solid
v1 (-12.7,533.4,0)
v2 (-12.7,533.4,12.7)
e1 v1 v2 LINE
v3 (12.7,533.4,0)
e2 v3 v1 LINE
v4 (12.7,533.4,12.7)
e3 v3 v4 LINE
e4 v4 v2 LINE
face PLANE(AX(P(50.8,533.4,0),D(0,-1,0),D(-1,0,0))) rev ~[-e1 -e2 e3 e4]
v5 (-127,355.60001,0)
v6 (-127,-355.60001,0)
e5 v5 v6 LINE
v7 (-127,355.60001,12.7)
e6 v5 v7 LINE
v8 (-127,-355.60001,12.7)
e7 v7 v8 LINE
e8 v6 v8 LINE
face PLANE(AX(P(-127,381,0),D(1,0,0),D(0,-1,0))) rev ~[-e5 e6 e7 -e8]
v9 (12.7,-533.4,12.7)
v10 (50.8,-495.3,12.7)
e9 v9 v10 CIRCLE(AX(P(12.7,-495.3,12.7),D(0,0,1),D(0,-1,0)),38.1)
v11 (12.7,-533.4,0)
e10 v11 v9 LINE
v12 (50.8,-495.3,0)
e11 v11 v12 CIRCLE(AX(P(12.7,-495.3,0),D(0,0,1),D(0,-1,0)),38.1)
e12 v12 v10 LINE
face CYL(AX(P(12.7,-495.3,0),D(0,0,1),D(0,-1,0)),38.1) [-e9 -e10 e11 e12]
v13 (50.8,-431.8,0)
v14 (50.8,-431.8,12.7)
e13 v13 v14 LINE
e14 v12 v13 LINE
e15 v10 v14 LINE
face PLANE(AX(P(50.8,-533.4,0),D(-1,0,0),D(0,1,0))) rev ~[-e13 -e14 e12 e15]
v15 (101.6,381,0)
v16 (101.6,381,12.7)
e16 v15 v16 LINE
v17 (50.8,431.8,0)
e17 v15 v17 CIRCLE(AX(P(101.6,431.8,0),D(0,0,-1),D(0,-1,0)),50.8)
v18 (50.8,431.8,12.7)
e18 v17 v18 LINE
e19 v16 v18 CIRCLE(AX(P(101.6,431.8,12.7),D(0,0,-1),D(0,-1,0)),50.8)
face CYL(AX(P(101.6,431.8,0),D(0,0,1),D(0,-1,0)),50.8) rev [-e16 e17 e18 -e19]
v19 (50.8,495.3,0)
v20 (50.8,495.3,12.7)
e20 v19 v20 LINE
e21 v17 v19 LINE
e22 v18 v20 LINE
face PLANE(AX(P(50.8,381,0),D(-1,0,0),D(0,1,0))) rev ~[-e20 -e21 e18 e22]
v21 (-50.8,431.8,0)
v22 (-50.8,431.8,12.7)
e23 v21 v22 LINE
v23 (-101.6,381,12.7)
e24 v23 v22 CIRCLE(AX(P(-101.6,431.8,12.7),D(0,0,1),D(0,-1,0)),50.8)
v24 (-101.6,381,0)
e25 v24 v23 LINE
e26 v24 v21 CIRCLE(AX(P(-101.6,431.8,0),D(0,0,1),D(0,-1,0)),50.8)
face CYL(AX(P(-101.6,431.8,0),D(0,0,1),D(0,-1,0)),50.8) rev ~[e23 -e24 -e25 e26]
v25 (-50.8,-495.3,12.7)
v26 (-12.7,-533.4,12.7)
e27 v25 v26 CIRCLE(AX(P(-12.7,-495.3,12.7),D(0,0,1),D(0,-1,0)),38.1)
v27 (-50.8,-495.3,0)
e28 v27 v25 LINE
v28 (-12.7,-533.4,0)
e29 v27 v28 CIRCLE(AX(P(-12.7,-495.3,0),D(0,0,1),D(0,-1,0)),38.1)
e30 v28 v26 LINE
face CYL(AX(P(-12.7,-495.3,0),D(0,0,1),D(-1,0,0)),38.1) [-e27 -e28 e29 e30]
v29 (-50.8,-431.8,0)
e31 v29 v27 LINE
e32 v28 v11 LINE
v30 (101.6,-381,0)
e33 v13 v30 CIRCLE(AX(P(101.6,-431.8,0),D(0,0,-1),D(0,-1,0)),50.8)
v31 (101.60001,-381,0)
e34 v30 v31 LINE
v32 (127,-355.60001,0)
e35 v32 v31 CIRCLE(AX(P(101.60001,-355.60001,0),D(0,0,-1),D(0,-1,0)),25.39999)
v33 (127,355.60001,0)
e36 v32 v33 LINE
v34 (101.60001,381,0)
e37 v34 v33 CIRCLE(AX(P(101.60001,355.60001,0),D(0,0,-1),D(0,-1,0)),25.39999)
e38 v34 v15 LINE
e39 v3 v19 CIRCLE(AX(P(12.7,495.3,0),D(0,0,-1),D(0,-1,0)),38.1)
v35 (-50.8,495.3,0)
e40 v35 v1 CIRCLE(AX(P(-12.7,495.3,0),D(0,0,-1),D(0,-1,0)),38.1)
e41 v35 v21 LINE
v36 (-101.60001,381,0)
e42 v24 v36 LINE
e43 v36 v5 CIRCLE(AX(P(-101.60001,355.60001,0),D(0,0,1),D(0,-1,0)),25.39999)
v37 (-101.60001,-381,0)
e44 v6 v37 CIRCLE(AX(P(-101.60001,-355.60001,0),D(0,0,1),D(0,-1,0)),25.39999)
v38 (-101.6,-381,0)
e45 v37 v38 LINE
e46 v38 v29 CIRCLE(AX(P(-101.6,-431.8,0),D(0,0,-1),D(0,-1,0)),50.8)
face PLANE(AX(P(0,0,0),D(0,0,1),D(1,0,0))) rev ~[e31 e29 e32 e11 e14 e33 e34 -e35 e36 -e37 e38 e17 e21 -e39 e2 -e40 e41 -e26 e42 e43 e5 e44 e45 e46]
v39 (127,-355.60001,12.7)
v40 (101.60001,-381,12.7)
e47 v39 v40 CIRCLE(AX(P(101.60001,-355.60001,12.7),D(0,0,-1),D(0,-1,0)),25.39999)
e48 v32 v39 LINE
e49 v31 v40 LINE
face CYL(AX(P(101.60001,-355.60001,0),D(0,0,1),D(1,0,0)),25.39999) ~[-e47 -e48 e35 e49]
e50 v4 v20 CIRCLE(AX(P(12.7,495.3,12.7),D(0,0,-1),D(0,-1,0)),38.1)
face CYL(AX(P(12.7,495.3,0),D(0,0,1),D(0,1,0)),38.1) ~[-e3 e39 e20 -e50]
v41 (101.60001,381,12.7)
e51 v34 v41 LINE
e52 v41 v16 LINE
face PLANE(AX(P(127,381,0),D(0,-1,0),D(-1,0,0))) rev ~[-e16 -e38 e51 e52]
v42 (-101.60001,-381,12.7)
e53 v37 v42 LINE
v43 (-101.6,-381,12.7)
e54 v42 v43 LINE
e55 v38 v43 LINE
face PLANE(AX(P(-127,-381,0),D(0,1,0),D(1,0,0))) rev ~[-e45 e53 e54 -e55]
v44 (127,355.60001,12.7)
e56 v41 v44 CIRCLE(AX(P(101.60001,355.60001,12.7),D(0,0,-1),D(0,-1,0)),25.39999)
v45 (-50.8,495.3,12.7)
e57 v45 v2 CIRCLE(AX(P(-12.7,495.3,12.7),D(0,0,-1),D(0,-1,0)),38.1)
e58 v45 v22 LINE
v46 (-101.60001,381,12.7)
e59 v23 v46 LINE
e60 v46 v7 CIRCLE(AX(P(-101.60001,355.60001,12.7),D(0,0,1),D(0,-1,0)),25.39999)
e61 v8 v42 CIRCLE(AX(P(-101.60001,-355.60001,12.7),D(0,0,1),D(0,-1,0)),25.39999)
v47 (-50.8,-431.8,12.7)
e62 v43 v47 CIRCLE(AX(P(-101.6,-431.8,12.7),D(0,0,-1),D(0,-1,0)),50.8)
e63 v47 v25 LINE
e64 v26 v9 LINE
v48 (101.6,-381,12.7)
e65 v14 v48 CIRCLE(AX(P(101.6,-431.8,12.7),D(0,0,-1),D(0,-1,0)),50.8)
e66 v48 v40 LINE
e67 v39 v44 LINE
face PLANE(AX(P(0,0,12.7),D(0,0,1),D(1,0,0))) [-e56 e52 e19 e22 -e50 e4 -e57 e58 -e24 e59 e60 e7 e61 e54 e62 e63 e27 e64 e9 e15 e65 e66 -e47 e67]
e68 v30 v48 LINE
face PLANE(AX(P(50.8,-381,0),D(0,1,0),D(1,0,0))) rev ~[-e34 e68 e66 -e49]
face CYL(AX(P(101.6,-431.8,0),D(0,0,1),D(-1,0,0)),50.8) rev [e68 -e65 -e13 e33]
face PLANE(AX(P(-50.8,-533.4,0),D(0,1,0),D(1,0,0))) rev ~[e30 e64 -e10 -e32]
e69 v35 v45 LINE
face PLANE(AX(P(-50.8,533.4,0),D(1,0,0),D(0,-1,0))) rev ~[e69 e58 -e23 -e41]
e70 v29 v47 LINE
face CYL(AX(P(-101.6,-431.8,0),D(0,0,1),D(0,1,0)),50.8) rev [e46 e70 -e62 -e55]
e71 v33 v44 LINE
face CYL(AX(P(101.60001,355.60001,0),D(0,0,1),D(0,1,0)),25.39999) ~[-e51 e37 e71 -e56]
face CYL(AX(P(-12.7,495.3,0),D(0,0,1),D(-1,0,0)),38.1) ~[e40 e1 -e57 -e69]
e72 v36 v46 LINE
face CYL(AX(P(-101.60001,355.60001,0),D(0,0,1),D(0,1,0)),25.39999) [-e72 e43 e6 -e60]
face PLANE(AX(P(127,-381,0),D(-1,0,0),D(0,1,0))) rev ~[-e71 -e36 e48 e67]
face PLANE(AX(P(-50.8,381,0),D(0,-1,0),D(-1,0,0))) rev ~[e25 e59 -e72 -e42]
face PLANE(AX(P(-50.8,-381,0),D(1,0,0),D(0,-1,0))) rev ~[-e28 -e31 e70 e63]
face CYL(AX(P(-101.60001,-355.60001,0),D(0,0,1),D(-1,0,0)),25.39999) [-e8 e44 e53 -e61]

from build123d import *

# Parameters (mm, degrees)
F1_DEPTH = 12.7
F2_R     = 50.8
F3_R     = 38.1
F4_R     = 25.39999


# Not quite as in the source:
# - a fillet or chamfer is up to 0.001 mm smaller than in the source, because OpenCascade refuses the exact size


with BuildPart() as f1:
    # F0 (on Top) → F1 (new body)
    with BuildSketch(Plane.XY):
        Polygon((-50.8, 381), (-127, 381), (-127, 0), (-127, -381), (-50.8, -381), (-50.8, -533.4), (50.8, -533.4), (50.8, -381), (127, -381), (127, 0), (127, 381), (50.8, 381), (50.8, 533.4), (-50.8, 533.4), align=None)
    extrude(amount=F1_DEPTH)

    # F2
    f2_edges = [f1.edges().sort_by_distance(p)[0] for p in [
        (-50.8, 381, 6.35),
        (50.8, 381, 6.35),
        (-50.8, -381, 6.35),
        (50.8, -381, 6.35),
    ]]
    fillet(f2_edges, radius=F2_R)

    # F3
    f3_edges = [f1.edges().sort_by_distance(p)[0] for p in [
        (-50.8, 533.4, 6.35),
        (50.8, 533.4, 6.35),
        (-50.8, -533.4, 6.35),
        (50.8, -533.4, 6.35),
    ]]
    fillet(f3_edges, radius=F3_R)

    # F4 (radius 25.4 in the source; OpenCascade refuses exactly that, so slightly less here)
    f4_edges = [f1.edges().sort_by_distance(p)[0] for p in [
        (-127, 381, 6.35),
        (127, 381, 6.35),
        (127, -381, 6.35),
        (-127, -381, 6.35),
    ]]
    fillet(f4_edges, radius=F4_R)


solid = f1.part
